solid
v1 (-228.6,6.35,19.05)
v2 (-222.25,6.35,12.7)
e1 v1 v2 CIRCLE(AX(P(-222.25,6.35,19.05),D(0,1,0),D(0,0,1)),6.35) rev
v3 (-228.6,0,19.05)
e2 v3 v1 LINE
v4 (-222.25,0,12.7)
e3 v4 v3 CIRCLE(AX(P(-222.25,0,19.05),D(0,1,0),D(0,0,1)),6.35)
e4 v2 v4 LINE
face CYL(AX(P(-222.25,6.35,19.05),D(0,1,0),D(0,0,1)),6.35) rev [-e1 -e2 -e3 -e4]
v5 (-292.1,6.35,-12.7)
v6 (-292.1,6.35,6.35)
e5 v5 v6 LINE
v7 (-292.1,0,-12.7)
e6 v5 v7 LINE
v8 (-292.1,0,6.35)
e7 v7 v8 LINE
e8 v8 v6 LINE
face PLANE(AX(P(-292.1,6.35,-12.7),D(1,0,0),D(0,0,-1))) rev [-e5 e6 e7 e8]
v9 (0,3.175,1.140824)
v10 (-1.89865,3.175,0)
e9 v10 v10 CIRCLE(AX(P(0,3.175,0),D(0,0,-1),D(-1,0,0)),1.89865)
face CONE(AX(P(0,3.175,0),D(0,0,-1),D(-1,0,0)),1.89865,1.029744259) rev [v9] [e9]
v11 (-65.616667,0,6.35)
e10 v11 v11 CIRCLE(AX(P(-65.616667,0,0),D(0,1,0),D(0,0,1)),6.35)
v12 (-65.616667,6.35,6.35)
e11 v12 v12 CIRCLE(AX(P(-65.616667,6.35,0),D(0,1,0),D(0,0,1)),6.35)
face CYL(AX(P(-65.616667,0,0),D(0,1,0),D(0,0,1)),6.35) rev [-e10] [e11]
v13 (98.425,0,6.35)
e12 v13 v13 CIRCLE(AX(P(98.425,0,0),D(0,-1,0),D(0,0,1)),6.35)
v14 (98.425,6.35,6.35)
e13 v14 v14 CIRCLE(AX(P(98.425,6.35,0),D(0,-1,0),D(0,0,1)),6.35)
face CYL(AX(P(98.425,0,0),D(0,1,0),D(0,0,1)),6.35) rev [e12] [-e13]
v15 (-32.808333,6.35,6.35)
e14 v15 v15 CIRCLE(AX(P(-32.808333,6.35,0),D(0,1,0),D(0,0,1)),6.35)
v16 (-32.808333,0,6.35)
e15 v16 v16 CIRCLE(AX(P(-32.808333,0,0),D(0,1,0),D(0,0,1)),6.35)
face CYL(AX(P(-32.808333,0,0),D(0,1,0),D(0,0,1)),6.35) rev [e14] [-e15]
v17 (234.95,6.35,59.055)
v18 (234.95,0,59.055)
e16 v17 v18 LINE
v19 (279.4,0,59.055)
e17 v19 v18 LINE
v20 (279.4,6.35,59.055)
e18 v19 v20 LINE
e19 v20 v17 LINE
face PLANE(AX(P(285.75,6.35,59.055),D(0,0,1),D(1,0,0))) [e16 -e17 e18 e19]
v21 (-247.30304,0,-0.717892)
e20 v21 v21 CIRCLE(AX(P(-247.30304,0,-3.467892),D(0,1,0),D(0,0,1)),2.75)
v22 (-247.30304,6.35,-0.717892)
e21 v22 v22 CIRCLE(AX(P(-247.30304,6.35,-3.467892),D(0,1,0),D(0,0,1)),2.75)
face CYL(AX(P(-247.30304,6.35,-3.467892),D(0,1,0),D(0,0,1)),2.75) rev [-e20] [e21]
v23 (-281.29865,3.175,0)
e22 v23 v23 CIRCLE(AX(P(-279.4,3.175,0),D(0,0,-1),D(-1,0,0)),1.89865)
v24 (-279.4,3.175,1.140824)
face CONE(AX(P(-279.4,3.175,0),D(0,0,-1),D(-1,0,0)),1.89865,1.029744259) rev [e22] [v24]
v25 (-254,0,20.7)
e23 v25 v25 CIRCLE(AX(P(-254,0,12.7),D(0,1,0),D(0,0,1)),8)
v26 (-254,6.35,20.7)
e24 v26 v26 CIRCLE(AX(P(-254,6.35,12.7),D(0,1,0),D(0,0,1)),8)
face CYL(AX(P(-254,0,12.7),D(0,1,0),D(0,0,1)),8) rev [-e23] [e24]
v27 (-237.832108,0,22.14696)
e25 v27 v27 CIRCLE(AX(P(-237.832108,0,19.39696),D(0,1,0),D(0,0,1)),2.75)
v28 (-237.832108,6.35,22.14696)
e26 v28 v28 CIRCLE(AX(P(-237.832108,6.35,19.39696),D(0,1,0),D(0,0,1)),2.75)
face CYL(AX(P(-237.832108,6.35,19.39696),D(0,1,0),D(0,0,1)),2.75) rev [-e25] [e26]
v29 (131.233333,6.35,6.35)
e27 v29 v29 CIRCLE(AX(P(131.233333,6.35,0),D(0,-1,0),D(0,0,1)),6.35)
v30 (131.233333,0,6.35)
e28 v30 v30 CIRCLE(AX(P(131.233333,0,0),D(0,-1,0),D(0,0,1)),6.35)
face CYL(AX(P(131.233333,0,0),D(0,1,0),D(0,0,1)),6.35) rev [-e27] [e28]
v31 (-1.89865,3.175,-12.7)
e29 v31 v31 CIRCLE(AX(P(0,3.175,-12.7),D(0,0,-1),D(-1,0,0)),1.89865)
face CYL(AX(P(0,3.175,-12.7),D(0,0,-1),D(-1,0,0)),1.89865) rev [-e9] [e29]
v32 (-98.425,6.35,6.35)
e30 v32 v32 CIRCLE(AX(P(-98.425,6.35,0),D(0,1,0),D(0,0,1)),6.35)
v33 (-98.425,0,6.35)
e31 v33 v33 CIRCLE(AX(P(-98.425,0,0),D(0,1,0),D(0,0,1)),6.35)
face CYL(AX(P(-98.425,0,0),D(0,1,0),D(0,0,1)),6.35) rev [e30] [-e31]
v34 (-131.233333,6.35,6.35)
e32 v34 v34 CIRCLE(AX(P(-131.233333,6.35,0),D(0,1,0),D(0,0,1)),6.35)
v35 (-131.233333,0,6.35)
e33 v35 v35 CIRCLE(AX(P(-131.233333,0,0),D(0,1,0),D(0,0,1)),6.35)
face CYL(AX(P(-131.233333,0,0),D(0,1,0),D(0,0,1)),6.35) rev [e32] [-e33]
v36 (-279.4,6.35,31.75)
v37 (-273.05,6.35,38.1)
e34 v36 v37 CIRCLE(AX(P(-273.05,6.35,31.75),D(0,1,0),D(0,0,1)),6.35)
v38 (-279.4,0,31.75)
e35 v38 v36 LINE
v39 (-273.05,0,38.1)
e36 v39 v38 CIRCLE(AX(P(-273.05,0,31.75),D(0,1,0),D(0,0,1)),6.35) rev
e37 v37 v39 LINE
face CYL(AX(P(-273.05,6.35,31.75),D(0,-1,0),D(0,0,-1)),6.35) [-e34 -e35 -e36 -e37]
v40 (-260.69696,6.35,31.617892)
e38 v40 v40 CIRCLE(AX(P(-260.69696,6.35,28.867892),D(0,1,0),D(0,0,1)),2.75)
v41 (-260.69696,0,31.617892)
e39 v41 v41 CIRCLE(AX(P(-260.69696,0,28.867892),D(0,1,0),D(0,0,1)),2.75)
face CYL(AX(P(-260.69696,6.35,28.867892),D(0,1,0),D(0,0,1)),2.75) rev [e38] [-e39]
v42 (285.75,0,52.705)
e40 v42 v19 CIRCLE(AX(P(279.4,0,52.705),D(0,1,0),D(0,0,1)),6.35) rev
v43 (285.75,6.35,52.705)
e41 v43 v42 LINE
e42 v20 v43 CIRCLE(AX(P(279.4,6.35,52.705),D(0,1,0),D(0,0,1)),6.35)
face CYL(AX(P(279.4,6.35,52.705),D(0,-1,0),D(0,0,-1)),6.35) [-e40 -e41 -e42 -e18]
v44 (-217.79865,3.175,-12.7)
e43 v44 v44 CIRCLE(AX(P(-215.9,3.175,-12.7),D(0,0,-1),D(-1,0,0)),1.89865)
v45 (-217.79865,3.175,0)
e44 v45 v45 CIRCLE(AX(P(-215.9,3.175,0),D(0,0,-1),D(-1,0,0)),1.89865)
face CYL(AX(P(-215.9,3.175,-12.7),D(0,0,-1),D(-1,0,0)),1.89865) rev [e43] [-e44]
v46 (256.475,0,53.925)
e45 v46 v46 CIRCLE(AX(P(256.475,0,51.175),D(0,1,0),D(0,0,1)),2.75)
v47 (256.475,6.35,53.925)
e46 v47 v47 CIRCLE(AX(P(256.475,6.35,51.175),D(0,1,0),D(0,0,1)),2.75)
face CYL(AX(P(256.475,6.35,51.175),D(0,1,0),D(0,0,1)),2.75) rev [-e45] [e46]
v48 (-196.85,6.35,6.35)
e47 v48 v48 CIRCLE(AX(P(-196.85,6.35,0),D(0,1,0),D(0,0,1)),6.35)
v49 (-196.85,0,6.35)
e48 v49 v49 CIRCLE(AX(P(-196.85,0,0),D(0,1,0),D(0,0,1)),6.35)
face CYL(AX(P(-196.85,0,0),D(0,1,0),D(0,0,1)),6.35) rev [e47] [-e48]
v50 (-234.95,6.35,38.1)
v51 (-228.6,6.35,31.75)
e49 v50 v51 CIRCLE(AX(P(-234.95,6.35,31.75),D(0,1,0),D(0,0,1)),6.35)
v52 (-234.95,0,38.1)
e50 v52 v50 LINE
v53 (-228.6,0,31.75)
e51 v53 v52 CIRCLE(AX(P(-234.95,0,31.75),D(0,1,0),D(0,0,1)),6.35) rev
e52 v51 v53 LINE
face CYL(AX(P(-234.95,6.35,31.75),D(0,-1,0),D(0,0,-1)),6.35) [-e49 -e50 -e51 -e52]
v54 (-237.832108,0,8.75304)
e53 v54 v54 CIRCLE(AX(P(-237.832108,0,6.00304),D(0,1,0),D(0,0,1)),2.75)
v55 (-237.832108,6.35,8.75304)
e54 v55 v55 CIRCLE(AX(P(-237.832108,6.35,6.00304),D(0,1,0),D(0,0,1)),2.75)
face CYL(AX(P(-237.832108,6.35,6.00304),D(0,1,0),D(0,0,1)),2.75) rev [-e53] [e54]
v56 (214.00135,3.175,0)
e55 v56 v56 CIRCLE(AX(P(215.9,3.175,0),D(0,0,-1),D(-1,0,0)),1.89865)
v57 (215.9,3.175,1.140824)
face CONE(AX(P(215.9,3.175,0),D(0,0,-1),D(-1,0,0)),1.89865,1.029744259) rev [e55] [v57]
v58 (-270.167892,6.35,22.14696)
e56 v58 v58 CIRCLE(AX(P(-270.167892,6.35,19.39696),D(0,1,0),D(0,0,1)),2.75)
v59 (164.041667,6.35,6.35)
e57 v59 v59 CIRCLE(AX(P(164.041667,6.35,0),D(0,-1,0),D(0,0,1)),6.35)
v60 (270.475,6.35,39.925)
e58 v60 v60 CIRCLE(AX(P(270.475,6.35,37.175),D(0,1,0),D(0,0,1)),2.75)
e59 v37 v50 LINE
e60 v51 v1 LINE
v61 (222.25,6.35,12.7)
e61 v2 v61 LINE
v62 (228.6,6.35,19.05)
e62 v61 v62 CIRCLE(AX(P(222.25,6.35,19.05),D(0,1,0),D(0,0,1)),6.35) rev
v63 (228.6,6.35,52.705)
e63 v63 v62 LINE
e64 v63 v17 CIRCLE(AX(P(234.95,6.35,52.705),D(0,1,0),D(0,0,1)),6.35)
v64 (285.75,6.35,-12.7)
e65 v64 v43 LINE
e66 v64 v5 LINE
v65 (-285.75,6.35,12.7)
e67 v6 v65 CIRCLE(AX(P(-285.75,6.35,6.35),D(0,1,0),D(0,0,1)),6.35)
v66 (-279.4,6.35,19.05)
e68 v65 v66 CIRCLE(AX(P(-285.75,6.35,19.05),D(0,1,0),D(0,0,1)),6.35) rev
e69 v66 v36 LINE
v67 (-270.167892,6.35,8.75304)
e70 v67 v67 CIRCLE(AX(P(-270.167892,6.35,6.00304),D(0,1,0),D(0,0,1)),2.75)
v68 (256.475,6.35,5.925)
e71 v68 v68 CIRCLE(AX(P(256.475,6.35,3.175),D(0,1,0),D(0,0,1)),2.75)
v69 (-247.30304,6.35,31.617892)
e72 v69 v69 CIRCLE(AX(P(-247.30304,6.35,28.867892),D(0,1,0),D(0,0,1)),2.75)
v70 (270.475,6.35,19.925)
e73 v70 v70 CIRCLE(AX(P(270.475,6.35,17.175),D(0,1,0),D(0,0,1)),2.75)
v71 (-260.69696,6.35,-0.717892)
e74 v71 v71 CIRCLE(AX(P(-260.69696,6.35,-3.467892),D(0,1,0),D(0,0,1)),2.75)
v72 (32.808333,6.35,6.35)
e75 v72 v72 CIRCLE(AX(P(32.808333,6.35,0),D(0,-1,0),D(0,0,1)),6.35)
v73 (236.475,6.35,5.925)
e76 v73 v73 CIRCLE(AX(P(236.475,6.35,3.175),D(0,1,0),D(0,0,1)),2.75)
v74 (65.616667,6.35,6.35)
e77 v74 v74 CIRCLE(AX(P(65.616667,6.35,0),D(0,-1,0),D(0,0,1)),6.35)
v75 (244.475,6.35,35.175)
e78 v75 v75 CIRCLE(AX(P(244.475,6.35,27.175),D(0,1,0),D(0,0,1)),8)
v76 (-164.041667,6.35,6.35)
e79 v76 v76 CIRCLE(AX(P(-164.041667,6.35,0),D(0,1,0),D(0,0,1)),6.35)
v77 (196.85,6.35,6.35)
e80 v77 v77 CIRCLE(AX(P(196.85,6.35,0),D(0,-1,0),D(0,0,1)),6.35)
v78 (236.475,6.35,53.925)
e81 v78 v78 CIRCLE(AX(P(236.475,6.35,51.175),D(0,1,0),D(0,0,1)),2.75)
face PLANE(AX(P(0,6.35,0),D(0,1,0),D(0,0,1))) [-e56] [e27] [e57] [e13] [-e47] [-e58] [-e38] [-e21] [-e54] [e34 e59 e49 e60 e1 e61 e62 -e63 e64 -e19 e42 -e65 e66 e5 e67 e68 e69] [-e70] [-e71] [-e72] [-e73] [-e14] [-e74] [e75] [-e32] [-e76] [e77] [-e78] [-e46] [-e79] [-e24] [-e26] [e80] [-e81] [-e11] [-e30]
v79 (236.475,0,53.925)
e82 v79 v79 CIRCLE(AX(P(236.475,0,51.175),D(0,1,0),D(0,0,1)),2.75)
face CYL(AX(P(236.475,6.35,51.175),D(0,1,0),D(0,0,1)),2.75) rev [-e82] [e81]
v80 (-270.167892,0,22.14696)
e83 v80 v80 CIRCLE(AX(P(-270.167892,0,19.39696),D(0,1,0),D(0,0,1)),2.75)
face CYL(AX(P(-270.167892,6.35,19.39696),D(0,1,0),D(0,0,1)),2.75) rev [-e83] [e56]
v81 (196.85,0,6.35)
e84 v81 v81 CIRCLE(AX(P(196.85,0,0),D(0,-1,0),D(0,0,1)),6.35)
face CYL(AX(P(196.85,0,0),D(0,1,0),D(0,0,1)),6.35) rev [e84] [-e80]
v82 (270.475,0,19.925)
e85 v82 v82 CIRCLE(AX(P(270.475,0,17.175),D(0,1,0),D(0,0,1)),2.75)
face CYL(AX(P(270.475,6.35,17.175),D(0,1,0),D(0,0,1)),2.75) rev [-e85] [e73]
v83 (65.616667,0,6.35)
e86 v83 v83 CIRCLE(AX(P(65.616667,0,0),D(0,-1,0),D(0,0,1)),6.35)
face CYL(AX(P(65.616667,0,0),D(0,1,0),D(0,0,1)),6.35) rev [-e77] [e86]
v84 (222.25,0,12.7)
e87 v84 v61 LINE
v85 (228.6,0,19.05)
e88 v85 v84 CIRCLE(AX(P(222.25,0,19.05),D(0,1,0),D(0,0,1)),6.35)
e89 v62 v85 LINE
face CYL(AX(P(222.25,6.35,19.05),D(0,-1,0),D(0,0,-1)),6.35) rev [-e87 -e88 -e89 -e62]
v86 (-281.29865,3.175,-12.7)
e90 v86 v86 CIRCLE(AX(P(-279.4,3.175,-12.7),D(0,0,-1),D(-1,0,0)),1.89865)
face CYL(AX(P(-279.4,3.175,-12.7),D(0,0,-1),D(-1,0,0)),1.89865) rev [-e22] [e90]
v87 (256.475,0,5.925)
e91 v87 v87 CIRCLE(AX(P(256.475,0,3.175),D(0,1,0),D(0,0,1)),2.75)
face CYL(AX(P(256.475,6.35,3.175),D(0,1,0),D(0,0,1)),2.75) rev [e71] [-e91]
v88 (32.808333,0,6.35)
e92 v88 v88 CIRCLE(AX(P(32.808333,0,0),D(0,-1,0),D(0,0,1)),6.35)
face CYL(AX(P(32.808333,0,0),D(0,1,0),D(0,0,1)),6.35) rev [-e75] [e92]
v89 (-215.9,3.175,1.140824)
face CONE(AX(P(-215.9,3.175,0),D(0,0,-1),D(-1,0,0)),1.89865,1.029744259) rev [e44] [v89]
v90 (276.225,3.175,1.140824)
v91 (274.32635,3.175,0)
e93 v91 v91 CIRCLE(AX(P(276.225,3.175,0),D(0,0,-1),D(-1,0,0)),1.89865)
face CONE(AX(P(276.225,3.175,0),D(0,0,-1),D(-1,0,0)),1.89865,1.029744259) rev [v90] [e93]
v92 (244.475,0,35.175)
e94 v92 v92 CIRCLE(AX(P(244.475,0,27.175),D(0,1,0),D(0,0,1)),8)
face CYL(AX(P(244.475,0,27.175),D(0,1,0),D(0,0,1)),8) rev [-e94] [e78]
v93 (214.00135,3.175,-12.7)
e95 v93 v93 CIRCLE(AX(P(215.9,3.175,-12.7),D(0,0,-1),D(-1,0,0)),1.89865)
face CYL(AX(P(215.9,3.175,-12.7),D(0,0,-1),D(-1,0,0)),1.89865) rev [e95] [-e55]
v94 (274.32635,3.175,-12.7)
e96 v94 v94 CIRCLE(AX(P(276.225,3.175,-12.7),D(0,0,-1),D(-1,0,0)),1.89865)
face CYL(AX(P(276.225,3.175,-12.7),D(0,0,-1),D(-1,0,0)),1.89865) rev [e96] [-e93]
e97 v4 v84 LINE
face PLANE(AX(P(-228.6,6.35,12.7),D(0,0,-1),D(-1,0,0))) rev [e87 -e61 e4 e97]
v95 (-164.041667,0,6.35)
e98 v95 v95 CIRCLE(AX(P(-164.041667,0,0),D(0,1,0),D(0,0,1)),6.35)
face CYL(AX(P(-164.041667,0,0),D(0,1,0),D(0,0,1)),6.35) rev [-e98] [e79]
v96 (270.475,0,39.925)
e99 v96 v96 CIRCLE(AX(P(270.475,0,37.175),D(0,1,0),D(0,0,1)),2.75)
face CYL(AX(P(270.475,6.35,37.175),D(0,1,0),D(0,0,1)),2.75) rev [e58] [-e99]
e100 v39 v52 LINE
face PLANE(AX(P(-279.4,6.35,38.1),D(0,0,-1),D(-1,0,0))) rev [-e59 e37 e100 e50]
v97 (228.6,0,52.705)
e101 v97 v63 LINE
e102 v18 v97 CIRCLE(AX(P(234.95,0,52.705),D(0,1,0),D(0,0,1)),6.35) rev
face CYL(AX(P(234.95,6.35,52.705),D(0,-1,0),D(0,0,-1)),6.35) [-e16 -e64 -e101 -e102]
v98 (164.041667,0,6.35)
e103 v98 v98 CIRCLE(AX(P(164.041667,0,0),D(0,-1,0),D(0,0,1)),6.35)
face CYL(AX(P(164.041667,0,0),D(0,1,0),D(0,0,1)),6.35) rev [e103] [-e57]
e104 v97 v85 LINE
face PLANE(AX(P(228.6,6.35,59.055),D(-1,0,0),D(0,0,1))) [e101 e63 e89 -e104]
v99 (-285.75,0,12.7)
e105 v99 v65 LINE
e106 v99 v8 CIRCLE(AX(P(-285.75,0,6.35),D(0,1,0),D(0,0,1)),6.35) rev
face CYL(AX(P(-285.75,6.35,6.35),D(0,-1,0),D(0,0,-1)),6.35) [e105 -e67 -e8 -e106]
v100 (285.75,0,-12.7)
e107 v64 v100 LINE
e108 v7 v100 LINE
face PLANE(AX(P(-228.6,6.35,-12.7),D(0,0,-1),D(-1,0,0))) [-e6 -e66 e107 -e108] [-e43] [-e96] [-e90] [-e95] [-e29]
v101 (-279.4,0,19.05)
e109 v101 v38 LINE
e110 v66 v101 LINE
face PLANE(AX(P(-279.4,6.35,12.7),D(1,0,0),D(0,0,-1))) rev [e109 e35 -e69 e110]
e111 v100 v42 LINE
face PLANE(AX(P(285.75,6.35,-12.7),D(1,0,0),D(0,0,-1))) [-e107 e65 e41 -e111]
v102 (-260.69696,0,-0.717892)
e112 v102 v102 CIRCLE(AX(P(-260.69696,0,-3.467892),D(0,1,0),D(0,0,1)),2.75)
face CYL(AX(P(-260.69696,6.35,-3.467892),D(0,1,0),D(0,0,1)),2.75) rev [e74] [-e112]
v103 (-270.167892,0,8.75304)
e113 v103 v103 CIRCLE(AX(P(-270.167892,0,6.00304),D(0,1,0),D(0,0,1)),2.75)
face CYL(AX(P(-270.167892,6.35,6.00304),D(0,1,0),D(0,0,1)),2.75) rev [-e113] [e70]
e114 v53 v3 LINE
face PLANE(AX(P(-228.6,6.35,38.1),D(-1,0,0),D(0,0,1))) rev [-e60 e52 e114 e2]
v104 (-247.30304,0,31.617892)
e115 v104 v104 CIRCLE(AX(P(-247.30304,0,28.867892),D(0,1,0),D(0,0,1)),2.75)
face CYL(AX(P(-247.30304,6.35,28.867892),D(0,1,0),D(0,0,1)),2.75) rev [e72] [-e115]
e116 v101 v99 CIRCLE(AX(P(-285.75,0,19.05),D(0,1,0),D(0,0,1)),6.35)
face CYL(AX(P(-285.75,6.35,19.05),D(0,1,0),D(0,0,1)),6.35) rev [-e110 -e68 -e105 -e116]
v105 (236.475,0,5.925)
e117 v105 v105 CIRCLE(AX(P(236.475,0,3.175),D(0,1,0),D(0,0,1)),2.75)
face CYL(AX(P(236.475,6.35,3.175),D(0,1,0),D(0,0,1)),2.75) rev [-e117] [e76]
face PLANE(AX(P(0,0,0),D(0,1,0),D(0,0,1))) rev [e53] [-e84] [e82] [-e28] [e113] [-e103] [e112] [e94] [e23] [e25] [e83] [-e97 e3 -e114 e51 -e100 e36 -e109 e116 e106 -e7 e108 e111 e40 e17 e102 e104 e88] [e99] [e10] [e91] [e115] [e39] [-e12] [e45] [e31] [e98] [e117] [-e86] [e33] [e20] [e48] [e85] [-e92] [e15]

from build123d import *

# Parameters (mm, degrees)
BOSS_EXTRUDE1_DEPTH       = 6.35
M5_CLEARANCE_HOLE1_D      = 5.5
M5_CLEARANCE_HOLE1_DEPTH  = 12.7
M5_CLEARANCE_HOLE1_TIP    = 1.652366702
F_6_CLEARANCE_HOLE2_D     = 3.7973
F_6_CLEARANCE_HOLE2_DEPTH = 12.7
F_6_CLEARANCE_HOLE2_TIP   = 1.140824014
M5_CLEARANCE_HOLE2_D      = 5.5
M5_CLEARANCE_HOLE2_DEPTH  = 12.7
M5_CLEARANCE_HOLE2_TIP    = 1.652366702
FILLET1_R                 = 6.35
SKETCH8_R                 = 8
CUT_EXTRUDE1_DEPTH        = 6.35
SKETCH11_R                = 6.35
CUT_EXTRUDE2_DEPTH        = 6.35


with BuildPart() as part:
    # Sketch1 → Boss-Extrude1 (new body)
    with BuildSketch(Plane(origin=(0, 0, 0), x_dir=(1, 0, 0), z_dir=(0, 1, 0))):
        Polygon((-228.6, 12.7), (228.6, 12.7), (285.75, 12.7), (285.75, -59.055), (228.6, -59.055), (228.6, -12.7), (-228.6, -12.7), (-228.6, -38.1), (-279.4, -38.1), (-279.4, -12.7), (-292.1, -12.7), (-292.1, 12.7), (-279.4, 12.7), align=None)
    extrude(amount=BOSS_EXTRUDE1_DEPTH)

    # M5 Clearance Hole1
    with Locations(Plane(origin=(0, 6.35, 0), x_dir=(1, 0, 0), z_dir=(0, 1, 0))):
        with Locations((-270.167891819, -6.003039934), (-260.696960066, -28.867891819), (-237.832108181, -19.396960066), (-260.696960066, 3.467891819), (-247.303039934, 3.467891819), (-237.832108181, -6.003039934), (-270.167891819, -19.396960066), (-247.303039934, -28.867891819)):
            Hole(M5_CLEARANCE_HOLE1_D / 2, depth=M5_CLEARANCE_HOLE1_DEPTH)
            with Locations((0, 0, -(M5_CLEARANCE_HOLE1_DEPTH + M5_CLEARANCE_HOLE1_TIP / 2))):  # 118° drill point
                Cone(0, M5_CLEARANCE_HOLE1_D / 2, M5_CLEARANCE_HOLE1_TIP, mode=Mode.SUBTRACT)

    # #6 Clearance Hole2
    with Locations(Plane(origin=(0, 0, -12.7), x_dir=(-1, 0, 0), z_dir=(0, 0, -1))):
        with Locations((279.4, 3.175), (215.9, 3.175), (0, 3.175), (-215.9, 3.175), (-276.225, 3.175)):
            Hole(F_6_CLEARANCE_HOLE2_D / 2, depth=F_6_CLEARANCE_HOLE2_DEPTH)
            with Locations((0, 0, -(F_6_CLEARANCE_HOLE2_DEPTH + F_6_CLEARANCE_HOLE2_TIP / 2))):  # 118° drill point
                Cone(0, F_6_CLEARANCE_HOLE2_D / 2, F_6_CLEARANCE_HOLE2_TIP, mode=Mode.SUBTRACT)

    # M5 Clearance Hole2
    with Locations(Plane(origin=(0, 6.35, 0), x_dir=(1, 0, 0), z_dir=(0, 1, 0))):
        with Locations((218.475, -17.174999994), (218.475, -37.174999994), (244.475, -27.174999994), (256.475, -3.175), (256.475, -51.175), (236.475, -3.175), (236.475, -51.175), (270.475, -17.174999994), (270.475, -37.174999994)):
            Hole(M5_CLEARANCE_HOLE2_D / 2, depth=M5_CLEARANCE_HOLE2_DEPTH)
            with Locations((0, 0, -(M5_CLEARANCE_HOLE2_DEPTH + M5_CLEARANCE_HOLE2_TIP / 2))):  # 118° drill point
                Cone(0, M5_CLEARANCE_HOLE2_D / 2, M5_CLEARANCE_HOLE2_TIP, mode=Mode.SUBTRACT)

    # Fillet1
    fillet1_edges = [part.edges().sort_by_distance(p)[0] for p in [
        (285.75, 3.175, 59.055),
        (228.6, 3.175, 59.055),
        (228.6, 3.175, 12.7),
        (-228.6, 3.175, 12.7),
        (-228.6, 3.175, 38.1),
        (-279.4, 3.175, 38.1),
        (-279.4, 3.175, 12.7),
        (-292.1, 3.175, 12.7),
    ]]
    fillet(fillet1_edges, radius=FILLET1_R - 0.0001)  # a hair under: the kernel refuses the full size

    # Sketch8 → Cut-Extrude1 (cut)
    with BuildSketch(Plane(origin=(0, 6.35, 0), x_dir=(1, 0, 0), z_dir=(0, 1, 0))):
        with Locations(Location((-254, -12.7, 0), (0, 0, 270))):
            Circle(SKETCH8_R)
        with Locations(Location((244.475, -27.174999994, 0), (0, 0, 270))):
            Circle(SKETCH8_R)
    extrude(amount=-CUT_EXTRUDE1_DEPTH, mode=Mode.SUBTRACT)

    # Sketch11 → Cut-Extrude2 (cut)
    with BuildSketch(Plane(origin=(0, 6.35, 0), x_dir=(1, 0, 0), z_dir=(0, 1, 0))):
        with Locations(Location((-196.85, 0, 0), (0, 0, 270))):
            Circle(SKETCH11_R)
        with Locations(Location((-164.041666667, 0, 0), (0, 0, 270))):
            Circle(SKETCH11_R)
        with Locations(Location((-131.233333333, 0, 0), (0, 0, 270))):
            Circle(SKETCH11_R)
        with Locations(Location((-98.425, 0, 0), (0, 0, 270))):
            Circle(SKETCH11_R)
        with Locations(Location((-65.616666667, 0, 0), (0, 0, 270))):
            Circle(SKETCH11_R)
        with Locations(Location((-32.808333333, 0, 0), (0, 0, 270))):
            Circle(SKETCH11_R)
    cut_extrude2 = extrude(amount=-CUT_EXTRUDE2_DEPTH, mode=Mode.SUBTRACT)

    # Mirror1: Cut-Extrude2 across plane
    add(cut_extrude2.mirror(Plane(origin=(0, 0, 0), x_dir=(0, 0, 1), z_dir=(1, 0, 0))), mode=Mode.SUBTRACT)


solid = part.part
